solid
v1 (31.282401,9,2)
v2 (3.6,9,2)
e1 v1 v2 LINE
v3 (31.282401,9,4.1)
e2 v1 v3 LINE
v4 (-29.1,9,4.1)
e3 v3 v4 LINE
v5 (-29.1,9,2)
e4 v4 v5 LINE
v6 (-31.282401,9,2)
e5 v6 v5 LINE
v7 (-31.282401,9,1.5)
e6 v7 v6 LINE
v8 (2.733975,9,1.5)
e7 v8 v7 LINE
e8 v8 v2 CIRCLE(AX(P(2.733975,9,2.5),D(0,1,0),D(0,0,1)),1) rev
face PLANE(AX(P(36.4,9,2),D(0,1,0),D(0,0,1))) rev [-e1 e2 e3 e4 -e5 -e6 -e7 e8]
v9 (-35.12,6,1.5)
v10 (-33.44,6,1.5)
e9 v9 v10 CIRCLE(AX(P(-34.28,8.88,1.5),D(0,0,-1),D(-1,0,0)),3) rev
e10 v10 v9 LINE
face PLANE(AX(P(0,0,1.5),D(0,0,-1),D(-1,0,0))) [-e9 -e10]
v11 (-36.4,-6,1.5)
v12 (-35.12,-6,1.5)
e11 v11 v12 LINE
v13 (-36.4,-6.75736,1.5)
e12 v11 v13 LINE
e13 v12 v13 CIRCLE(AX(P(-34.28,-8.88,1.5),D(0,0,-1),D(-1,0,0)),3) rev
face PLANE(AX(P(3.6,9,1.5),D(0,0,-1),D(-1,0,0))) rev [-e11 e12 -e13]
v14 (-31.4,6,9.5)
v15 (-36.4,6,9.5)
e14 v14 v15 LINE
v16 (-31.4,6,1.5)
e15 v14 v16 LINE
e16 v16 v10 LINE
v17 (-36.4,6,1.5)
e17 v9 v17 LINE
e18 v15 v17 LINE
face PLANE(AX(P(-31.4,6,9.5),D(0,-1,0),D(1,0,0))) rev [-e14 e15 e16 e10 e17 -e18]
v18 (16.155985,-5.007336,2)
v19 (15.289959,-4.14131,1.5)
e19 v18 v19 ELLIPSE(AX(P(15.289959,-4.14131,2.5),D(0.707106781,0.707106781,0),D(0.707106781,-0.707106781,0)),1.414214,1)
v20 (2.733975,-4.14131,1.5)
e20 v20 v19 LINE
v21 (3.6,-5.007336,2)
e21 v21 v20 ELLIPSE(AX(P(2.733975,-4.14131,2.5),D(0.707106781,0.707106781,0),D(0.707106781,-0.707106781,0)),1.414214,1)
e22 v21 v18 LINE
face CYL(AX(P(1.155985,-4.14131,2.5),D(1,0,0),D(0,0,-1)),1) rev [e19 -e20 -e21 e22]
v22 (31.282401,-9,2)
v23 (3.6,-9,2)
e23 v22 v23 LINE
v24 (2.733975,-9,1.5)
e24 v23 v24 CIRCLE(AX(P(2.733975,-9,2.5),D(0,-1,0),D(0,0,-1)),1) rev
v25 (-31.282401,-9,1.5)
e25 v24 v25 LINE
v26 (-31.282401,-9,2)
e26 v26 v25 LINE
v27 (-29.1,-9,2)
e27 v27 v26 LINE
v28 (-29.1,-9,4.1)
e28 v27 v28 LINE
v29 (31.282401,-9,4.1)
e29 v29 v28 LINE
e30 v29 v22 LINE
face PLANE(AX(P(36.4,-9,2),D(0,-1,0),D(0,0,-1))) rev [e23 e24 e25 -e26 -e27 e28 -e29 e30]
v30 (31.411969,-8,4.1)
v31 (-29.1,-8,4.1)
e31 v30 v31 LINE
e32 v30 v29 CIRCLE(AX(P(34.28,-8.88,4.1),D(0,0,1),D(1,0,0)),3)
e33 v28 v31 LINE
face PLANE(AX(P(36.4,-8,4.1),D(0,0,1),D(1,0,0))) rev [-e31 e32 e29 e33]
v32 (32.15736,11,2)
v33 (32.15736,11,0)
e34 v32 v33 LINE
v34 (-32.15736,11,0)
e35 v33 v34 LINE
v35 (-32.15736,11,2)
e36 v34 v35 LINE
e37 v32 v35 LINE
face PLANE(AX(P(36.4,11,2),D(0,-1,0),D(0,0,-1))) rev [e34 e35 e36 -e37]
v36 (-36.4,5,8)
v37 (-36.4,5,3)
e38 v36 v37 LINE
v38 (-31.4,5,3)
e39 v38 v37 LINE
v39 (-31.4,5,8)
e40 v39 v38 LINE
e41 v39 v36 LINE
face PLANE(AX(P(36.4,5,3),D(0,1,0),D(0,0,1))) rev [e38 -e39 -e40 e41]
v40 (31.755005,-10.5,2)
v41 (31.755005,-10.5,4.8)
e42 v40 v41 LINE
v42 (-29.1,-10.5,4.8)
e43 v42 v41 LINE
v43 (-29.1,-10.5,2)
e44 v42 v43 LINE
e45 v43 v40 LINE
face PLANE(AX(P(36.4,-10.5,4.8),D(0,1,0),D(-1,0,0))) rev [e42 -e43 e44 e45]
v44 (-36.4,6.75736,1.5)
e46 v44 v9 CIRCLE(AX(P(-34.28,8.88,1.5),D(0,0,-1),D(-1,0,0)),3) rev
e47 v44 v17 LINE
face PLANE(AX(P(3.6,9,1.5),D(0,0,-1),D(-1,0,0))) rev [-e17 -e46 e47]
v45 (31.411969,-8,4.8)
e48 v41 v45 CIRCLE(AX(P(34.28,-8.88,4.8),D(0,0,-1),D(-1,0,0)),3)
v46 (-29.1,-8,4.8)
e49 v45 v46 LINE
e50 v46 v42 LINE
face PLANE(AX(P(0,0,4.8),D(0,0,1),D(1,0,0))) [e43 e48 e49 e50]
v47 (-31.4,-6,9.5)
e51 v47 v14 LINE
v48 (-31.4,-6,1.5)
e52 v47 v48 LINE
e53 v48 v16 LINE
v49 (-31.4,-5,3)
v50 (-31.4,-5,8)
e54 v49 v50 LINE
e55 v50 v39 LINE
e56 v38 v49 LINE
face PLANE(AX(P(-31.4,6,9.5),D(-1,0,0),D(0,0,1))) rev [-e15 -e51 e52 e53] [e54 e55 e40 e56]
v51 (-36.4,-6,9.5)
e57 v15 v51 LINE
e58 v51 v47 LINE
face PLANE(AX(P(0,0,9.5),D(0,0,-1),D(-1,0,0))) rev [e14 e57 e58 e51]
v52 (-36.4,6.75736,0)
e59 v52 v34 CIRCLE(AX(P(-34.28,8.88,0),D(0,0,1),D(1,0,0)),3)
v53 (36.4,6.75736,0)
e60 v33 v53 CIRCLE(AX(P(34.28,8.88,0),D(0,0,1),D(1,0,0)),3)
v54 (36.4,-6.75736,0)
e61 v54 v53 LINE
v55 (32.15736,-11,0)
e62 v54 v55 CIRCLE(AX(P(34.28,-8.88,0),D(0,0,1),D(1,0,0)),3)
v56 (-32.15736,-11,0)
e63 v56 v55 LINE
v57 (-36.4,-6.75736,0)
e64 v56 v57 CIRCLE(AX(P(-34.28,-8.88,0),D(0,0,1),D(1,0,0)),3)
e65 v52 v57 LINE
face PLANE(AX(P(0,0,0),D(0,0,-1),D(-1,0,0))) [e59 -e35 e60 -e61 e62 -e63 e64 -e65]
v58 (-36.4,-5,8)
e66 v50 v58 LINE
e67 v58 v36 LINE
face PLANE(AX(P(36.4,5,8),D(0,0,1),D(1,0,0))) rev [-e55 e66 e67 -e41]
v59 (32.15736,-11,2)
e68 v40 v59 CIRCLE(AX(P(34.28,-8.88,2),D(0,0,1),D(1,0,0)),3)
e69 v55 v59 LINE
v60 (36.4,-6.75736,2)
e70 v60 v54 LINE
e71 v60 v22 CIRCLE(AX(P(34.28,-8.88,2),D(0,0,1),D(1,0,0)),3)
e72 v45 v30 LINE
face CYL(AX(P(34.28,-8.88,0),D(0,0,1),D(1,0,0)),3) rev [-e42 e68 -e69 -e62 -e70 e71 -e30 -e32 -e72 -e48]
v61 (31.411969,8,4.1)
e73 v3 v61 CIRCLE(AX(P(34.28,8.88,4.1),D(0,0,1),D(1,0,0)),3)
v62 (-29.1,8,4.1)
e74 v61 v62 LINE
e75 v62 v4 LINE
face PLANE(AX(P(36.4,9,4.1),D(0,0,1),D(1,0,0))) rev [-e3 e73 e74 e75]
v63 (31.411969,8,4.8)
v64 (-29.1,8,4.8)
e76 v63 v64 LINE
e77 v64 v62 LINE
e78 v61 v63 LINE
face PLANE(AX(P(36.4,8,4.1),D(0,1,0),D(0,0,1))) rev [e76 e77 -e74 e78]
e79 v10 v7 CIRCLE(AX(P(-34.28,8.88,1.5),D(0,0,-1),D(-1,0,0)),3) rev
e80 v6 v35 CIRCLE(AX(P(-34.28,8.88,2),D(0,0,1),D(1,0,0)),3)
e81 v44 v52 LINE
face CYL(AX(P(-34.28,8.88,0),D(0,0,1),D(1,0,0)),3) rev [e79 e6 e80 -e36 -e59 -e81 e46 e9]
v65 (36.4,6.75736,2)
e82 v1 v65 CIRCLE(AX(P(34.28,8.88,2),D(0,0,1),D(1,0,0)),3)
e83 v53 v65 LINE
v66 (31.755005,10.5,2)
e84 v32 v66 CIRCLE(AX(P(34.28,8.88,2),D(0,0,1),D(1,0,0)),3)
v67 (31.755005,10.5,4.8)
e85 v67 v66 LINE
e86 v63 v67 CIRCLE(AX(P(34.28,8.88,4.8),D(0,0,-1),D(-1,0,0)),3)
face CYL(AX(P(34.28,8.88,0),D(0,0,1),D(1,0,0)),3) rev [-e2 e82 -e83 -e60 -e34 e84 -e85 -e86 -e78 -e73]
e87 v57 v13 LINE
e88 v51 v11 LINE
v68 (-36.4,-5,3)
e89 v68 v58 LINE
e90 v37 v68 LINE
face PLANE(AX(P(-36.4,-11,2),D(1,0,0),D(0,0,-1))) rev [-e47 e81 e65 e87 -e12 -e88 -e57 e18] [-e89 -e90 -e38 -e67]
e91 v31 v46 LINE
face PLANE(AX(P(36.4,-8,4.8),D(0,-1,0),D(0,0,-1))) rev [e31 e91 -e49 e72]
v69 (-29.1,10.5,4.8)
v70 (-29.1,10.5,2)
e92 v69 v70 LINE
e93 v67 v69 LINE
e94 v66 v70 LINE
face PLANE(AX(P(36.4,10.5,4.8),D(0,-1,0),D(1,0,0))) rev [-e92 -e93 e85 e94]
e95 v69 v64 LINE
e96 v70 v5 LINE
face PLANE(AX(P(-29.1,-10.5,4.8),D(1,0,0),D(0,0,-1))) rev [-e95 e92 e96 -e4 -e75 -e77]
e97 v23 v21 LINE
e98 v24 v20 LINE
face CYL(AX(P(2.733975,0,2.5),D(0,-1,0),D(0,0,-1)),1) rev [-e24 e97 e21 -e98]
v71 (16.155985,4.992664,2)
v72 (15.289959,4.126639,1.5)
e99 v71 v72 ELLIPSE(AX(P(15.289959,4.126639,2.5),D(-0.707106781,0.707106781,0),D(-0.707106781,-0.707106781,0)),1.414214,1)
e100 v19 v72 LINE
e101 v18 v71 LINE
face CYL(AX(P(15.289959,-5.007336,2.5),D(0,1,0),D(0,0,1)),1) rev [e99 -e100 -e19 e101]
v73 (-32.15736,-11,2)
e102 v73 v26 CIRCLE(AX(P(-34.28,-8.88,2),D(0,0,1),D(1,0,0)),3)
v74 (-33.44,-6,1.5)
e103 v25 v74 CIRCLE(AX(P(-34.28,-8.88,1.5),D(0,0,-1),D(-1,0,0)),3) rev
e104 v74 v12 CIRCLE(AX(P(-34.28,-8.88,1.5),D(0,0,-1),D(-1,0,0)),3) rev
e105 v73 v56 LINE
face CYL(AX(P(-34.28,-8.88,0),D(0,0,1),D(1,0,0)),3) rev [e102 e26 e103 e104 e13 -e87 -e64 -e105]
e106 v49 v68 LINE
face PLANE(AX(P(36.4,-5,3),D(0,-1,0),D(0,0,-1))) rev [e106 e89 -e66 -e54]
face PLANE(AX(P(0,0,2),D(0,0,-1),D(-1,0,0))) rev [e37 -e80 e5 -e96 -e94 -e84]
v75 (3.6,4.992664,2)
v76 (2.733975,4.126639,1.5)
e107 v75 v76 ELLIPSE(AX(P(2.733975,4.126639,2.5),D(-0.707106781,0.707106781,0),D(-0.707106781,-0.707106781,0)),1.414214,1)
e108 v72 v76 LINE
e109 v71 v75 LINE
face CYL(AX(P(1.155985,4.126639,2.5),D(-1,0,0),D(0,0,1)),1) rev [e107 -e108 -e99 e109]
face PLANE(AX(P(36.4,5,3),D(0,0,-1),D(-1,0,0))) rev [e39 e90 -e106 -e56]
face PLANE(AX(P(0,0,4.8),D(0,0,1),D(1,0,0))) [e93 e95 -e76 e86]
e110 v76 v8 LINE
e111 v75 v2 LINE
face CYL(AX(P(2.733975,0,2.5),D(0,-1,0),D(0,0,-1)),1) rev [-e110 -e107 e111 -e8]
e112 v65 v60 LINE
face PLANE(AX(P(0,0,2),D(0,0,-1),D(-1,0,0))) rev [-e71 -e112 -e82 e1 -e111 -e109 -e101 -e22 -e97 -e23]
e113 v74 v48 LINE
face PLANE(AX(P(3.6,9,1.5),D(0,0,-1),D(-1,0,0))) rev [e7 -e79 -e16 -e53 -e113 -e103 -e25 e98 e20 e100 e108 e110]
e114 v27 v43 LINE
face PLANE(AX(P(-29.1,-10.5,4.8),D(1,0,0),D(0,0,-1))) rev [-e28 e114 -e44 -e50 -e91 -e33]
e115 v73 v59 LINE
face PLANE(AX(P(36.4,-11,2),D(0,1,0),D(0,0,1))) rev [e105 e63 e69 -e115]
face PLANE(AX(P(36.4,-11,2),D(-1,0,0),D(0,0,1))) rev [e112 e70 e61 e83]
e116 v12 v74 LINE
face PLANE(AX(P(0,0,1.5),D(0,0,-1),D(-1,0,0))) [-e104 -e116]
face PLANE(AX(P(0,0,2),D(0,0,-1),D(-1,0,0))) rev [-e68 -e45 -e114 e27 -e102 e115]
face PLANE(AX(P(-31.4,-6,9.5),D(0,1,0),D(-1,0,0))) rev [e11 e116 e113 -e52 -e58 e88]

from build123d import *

# Parameters (mm, degrees)
SKIZZE1_W                       = 22
SKIZZE1_H                       = 72.8
AUFSATZ_LINEAR_AUSTRAGEN1_DEPTH = 2
SKIZZE2_R                       = 3
SCHNITT_LINEAR_AUSTRAGEN1_DEPTH = 2
SKIZZE3_W                       = 65.5
SKIZZE3_H                       = 21
AUFSATZ_LINEAR_AUSTRAGEN2_DEPTH = 2.8
SCHNITT_LINEAR_AUSTRAGEN2_DEPTH = 67.590464783
SKIZZE5_R                       = 3
SCHNITT_LINEAR_AUSTRAGEN4_DEPTH = 39.128729326
SKIZZE6_W                       = 18
SKIZZE6_H                       = 1
SCHNITT_LINEAR_AUSTRAGEN5_DEPTH = 40
SKIZZE8_W                       = 15
SKIZZE8_H                       = 10
SCHNITT_LINEAR_AUSTRAGEN6_DEPTH = 0.5
VERRUNDUNG3_R                   = 1
SKIZZE9_W                       = 5
SKIZZE9_H                       = 12
AUFSATZ_LINEAR_AUSTRAGEN3_DEPTH = 8
SKIZZE10_W                      = 10
SKIZZE10_H                      = 5
SCHNITT_LINEAR_AUSTRAGEN7_DEPTH = 75.236715983


with BuildPart() as part:
    # Skizze1 → Aufsatz-Linear austragen1 (new body)
    with BuildSketch(Plane(origin=(0, 0, 0), x_dir=(0, 1, 0), z_dir=(0, 0, 1))):
        Rectangle(SKIZZE1_W, SKIZZE1_H)
    extrude(amount=AUFSATZ_LINEAR_AUSTRAGEN1_DEPTH)

    # Skizze2 → Schnitt-Linear austragen1 (cut)
    with BuildSketch(Plane.XY.offset(2)):
        with Locations((-34.28, 8.88)):
            Circle(SKIZZE2_R)
        with Locations((-34.28, -8.88)):
            Circle(SKIZZE2_R)
        with Locations((34.28, -8.88)):
            Circle(SKIZZE2_R)
        with Locations((34.28, 8.88)):
            Circle(SKIZZE2_R)
    extrude(amount=-SCHNITT_LINEAR_AUSTRAGEN1_DEPTH, mode=Mode.SUBTRACT)

    # Skizze3 → Aufsatz-Linear austragen2 (add)
    with BuildSketch(Plane.XY.offset(2)):
        with Locations((3.65, 0)):
            Rectangle(SKIZZE3_W, SKIZZE3_H)
    extrude(amount=AUFSATZ_LINEAR_AUSTRAGEN2_DEPTH)

    # Skizze4 → Schnitt-Linear austragen2 (cut, through all)
    with BuildSketch(Plane(origin=(-29.1, 0, 0), x_dir=(0, -1, 0), z_dir=(-1, 0, 0))):
        Polygon((-8, 4.8), (8, 4.8), (8, 4.1), (9, 4.1), (9, 2), (-9, 2), (-9, 4.1), (-8, 4.1), align=None)
    extrude(amount=-SCHNITT_LINEAR_AUSTRAGEN2_DEPTH, mode=Mode.SUBTRACT)

    # Skizze5 → Schnitt-Linear austragen4 (cut, through all)
    with BuildSketch(Plane(origin=(0, 0, 2), x_dir=(1, 0, 0), z_dir=(0, 0, -1))):
        with Locations((34.28, -8.88)):
            Circle(SKIZZE5_R)
        with Locations((34.28, 8.88)):
            Circle(SKIZZE5_R)
    extrude(amount=-SCHNITT_LINEAR_AUSTRAGEN4_DEPTH, mode=Mode.SUBTRACT)

    # Skizze6 → Schnitt-Linear austragen5 (cut)
    with BuildSketch(Plane(origin=(-36.4, 0, 0), x_dir=(0, -1, 0), z_dir=(-1, 0, 0))):
        with Locations((0, 2)):
            Rectangle(SKIZZE6_W, SKIZZE6_H)
    extrude(amount=-SCHNITT_LINEAR_AUSTRAGEN5_DEPTH, mode=Mode.SUBTRACT)

    # Skizze8 → Schnitt-Linear austragen6 (cut)
    with BuildSketch(Plane.XY.offset(2)):
        with Locations((8.655984658, -0.007335612)):
            Rectangle(SKIZZE8_W, SKIZZE8_H)
    extrude(amount=-SCHNITT_LINEAR_AUSTRAGEN6_DEPTH, mode=Mode.SUBTRACT)

    # Verrundung3
    # the kernel refuses this fillet: 1 mm, written as the material it adds along each edge
    with BuildSketch(Plane(origin=(3.6, -9, 1.5), x_dir=(0, 0, 1), z_dir=(0, 1, 0))) as verrundung3_piece_1:
        with BuildLine():
            CenterArc((1, -0.866025404), VERRUNDUNG3_R, 120, 60)
            Line((0, -0.866025404), (-0.02, -0.866025404))
            Line((-0.02, -0.866025404), (-0.02, 0))
            Line((-0.02, 0), (0, 0.02))
            ThreePointArc((0, 0.02), (0.25, 0.02), (0.49, 0.017320508))
            Line((0.49, 0.017320508), (0.5, 0))
        make_face()
    extrude(amount=3.992664388)
    with BuildSketch(Plane(origin=(3.6, -5.007335612, 1.5), x_dir=(0, 0, 1), z_dir=(1, 0, 0)), Plane(origin=(16.155984658, 4.992664388, 1.5), x_dir=(0, 0, 1), z_dir=(-1, 0, 0))) as verrundung3_piece_2:
        with BuildLine():
            CenterArc((1, -0.866025404), VERRUNDUNG3_R, 120, 60)
            Line((0, -0.866025404), (-0.02, -0.866025404))
            Line((-0.02, -0.866025404), (-0.02, 0))
            Line((-0.02, 0), (0, 0.02))
            ThreePointArc((0, 0.02), (0.25, 0.02), (0.49, 0.017320508))
            Line((0.49, 0.017320508), (0.5, 0))
        make_face()
    extrude(amount=12.555984658)
    with BuildSketch(Plane(origin=(3.6, 4.992664388, 1.5), x_dir=(0, 0, 1), z_dir=(0, 1, 0))) as verrundung3_piece_3:
        with BuildLine():
            CenterArc((1, -0.866025404), VERRUNDUNG3_R, 120, 60)
            Line((0, -0.866025404), (-0.02, -0.866025404))
            Line((-0.02, -0.866025404), (-0.02, 0))
            Line((-0.02, 0), (0, 0.02))
            ThreePointArc((0, 0.02), (0.25, 0.02), (0.49, 0.017320508))
            Line((0.49, 0.017320508), (0.5, 0))
        make_face()
    extrude(amount=4.007335612)
    with BuildSketch(Plane(origin=(16.155984658, -5.007335612, 1.5), x_dir=(0, 0, 1), z_dir=(0, 1, 0))) as verrundung3_piece_4:
        with BuildLine():
            CenterArc((1, -0.866025404), VERRUNDUNG3_R, 120, 60)
            Line((0, -0.866025404), (-0.02, -0.866025404))
            Line((-0.02, -0.866025404), (-0.02, 0))
            Line((-0.02, 0), (0, 0.02))
            ThreePointArc((0, 0.02), (0.25, 0.02), (0.49, 0.017320508))
            Line((0.49, 0.017320508), (0.5, 0))
        make_face()
    extrude(amount=10)
    with BuildSketch(Plane(origin=(3.6, -9, 1.5), x_dir=(0, 0, 1), z_dir=(0, 1, 0))) as verrundung3_piece_5a_section:
        with BuildLine():
            CenterArc((1, -0.866025404), VERRUNDUNG3_R, 120, 60)
            Line((0, -0.866025404), (-0.02, -0.866025404))
            Line((-0.02, -0.866025404), (-0.02, 0))
            Line((-0.02, 0), (0, 0.02))
            ThreePointArc((0, 0.02), (0.25, 0.02), (0.49, 0.017320508))
            Line((0.49, 0.017320508), (0.5, 0))
        make_face()
    verrundung3_piece_5a = extrude(amount=6.157727897, mode=Mode.PRIVATE)
    verrundung3_piece_5a = split(verrundung3_piece_5a, bisect_by=Plane(origin=(3.383689554, -5.007335612, 1.629516711), z_dir=(0, 1, 0)), keep=Keep.TOP, mode=Mode.PRIVATE)
    with BuildSketch(Plane(origin=(1.434936491, -5.007335612, 1.5), x_dir=(0, 0, 1), z_dir=(1, 0, 0))) as verrundung3_piece_5b_section:
        with BuildLine():
            CenterArc((1, -0.866025404), VERRUNDUNG3_R, 120, 60)
            Line((0, -0.866025404), (-0.02, -0.866025404))
            Line((-0.02, -0.866025404), (-0.02, 0))
            Line((-0.02, 0), (0, 0.02))
            ThreePointArc((0, 0.02), (0.25, 0.02), (0.49, 0.017320508))
            Line((0.49, 0.017320508), (0.5, 0))
        make_face()
    verrundung3_piece_5b = extrude(amount=14.721048168, mode=Mode.PRIVATE)
    verrundung3_piece_5b = split(verrundung3_piece_5b, bisect_by=Plane(origin=(3.6, -4.791025166, 1.629516711), z_dir=(-1, 0, 0)), keep=Keep.TOP, mode=Mode.PRIVATE)
    verrundung3_piece_5 = verrundung3_piece_5a & verrundung3_piece_5b
    add(verrundung3_piece_5)
    with BuildSketch(Plane(origin=(3.6, -5.007335612, 1.5), x_dir=(0, 0, 1), z_dir=(1, 0, 0))) as verrundung3_piece_6a_section:
        with BuildLine():
            CenterArc((1, -0.866025404), VERRUNDUNG3_R, 120, 60)
            Line((0, -0.866025404), (-0.02, -0.866025404))
            Line((-0.02, -0.866025404), (-0.02, 0))
            Line((-0.02, 0), (0, 0.02))
            ThreePointArc((0, 0.02), (0.25, 0.02), (0.49, 0.017320508))
            Line((0.49, 0.017320508), (0.5, 0))
        make_face()
    verrundung3_piece_6a = extrude(amount=14.721048168, mode=Mode.PRIVATE)
    verrundung3_piece_6a = split(verrundung3_piece_6a, bisect_by=Plane(origin=(16.155984658, -4.791025166, 1.629516711), z_dir=(1, 0, 0)), keep=Keep.TOP, mode=Mode.PRIVATE)
    with BuildSketch(Plane(origin=(16.155984658, -7.172399122, 1.5), x_dir=(0, 0, 1), z_dir=(0, 1, 0))) as verrundung3_piece_6b_section:
        with BuildLine():
            CenterArc((1, -0.866025404), VERRUNDUNG3_R, 120, 60)
            Line((0, -0.866025404), (-0.02, -0.866025404))
            Line((-0.02, -0.866025404), (-0.02, 0))
            Line((-0.02, 0), (0, 0.02))
            ThreePointArc((0, 0.02), (0.25, 0.02), (0.49, 0.017320508))
            Line((0.49, 0.017320508), (0.5, 0))
        make_face()
    verrundung3_piece_6b = extrude(amount=12.165063509, mode=Mode.PRIVATE)
    verrundung3_piece_6b = split(verrundung3_piece_6b, bisect_by=Plane(origin=(15.939674213, -5.007335612, 1.629516711), z_dir=(0, -1, 0)), keep=Keep.TOP, mode=Mode.PRIVATE)
    verrundung3_piece_6 = verrundung3_piece_6a & verrundung3_piece_6b
    add(verrundung3_piece_6)
    with BuildSketch(Plane(origin=(16.155984658, 4.992664388, 1.5), x_dir=(0, 0, 1), z_dir=(-1, 0, 0))) as verrundung3_piece_7a_section:
        with BuildLine():
            CenterArc((1, -0.866025404), VERRUNDUNG3_R, 120, 60)
            Line((0, -0.866025404), (-0.02, -0.866025404))
            Line((-0.02, -0.866025404), (-0.02, 0))
            Line((-0.02, 0), (0, 0.02))
            ThreePointArc((0, 0.02), (0.25, 0.02), (0.49, 0.017320508))
            Line((0.49, 0.017320508), (0.5, 0))
        make_face()
    verrundung3_piece_7a = extrude(amount=14.721048168, mode=Mode.PRIVATE)
    verrundung3_piece_7a = split(verrundung3_piece_7a, bisect_by=Plane(origin=(3.6, 4.776353942, 1.629516711), z_dir=(-1, 0, 0)), keep=Keep.TOP, mode=Mode.PRIVATE)
    with BuildSketch(Plane(origin=(3.6, 2.827600878, 1.5), x_dir=(0, 0, 1), z_dir=(0, 1, 0))) as verrundung3_piece_7b_section:
        with BuildLine():
            CenterArc((1, -0.866025404), VERRUNDUNG3_R, 120, 60)
            Line((0, -0.866025404), (-0.02, -0.866025404))
            Line((-0.02, -0.866025404), (-0.02, 0))
            Line((-0.02, 0), (0, 0.02))
            ThreePointArc((0, 0.02), (0.25, 0.02), (0.49, 0.017320508))
            Line((0.49, 0.017320508), (0.5, 0))
        make_face()
    verrundung3_piece_7b = extrude(amount=6.172399122, mode=Mode.PRIVATE)
    verrundung3_piece_7b = split(verrundung3_piece_7b, bisect_by=Plane(origin=(3.383689554, 4.992664388, 1.629516711), z_dir=(0, -1, 0)), keep=Keep.TOP, mode=Mode.PRIVATE)
    verrundung3_piece_7 = verrundung3_piece_7a & verrundung3_piece_7b
    add(verrundung3_piece_7)
    with BuildSketch(Plane(origin=(16.155984658, -5.007335612, 1.5), x_dir=(0, 0, 1), z_dir=(0, 1, 0))) as verrundung3_piece_8a_section:
        with BuildLine():
            CenterArc((1, -0.866025404), VERRUNDUNG3_R, 120, 60)
            Line((0, -0.866025404), (-0.02, -0.866025404))
            Line((-0.02, -0.866025404), (-0.02, 0))
            Line((-0.02, 0), (0, 0.02))
            ThreePointArc((0, 0.02), (0.25, 0.02), (0.49, 0.017320508))
            Line((0.49, 0.017320508), (0.5, 0))
        make_face()
    verrundung3_piece_8a = extrude(amount=12.165063509, mode=Mode.PRIVATE)
    verrundung3_piece_8a = split(verrundung3_piece_8a, bisect_by=Plane(origin=(15.939674213, 4.992664388, 1.629516711), z_dir=(0, 1, 0)), keep=Keep.TOP, mode=Mode.PRIVATE)
    with BuildSketch(Plane(origin=(18.321048168, 4.992664388, 1.5), x_dir=(0, 0, 1), z_dir=(-1, 0, 0))) as verrundung3_piece_8b_section:
        with BuildLine():
            CenterArc((1, -0.866025404), VERRUNDUNG3_R, 120, 60)
            Line((0, -0.866025404), (-0.02, -0.866025404))
            Line((-0.02, -0.866025404), (-0.02, 0))
            Line((-0.02, 0), (0, 0.02))
            ThreePointArc((0, 0.02), (0.25, 0.02), (0.49, 0.017320508))
            Line((0.49, 0.017320508), (0.5, 0))
        make_face()
    verrundung3_piece_8b = extrude(amount=14.721048168, mode=Mode.PRIVATE)
    verrundung3_piece_8b = split(verrundung3_piece_8b, bisect_by=Plane(origin=(16.155984658, 4.776353942, 1.629516711), z_dir=(1, 0, 0)), keep=Keep.TOP, mode=Mode.PRIVATE)
    verrundung3_piece_8 = verrundung3_piece_8a & verrundung3_piece_8b
    add(verrundung3_piece_8)

    # Skizze9 → Aufsatz-Linear austragen3 (add)
    with BuildSketch(Plane.XY.offset(1.5)):
        with Locations((-33.9, 0)):
            Rectangle(SKIZZE9_W, SKIZZE9_H)
    extrude(amount=AUFSATZ_LINEAR_AUSTRAGEN3_DEPTH)

    # Skizze10 → Schnitt-Linear austragen7 (cut, through all)
    with BuildSketch(Plane(origin=(-36.4, 0, 0), x_dir=(0, -1, 0), z_dir=(-1, 0, 0))):
        with Locations((0, 5.5)):
            Rectangle(SKIZZE10_W, SKIZZE10_H)
    extrude(amount=-SCHNITT_LINEAR_AUSTRAGEN7_DEPTH, mode=Mode.SUBTRACT)


solid = part.part
